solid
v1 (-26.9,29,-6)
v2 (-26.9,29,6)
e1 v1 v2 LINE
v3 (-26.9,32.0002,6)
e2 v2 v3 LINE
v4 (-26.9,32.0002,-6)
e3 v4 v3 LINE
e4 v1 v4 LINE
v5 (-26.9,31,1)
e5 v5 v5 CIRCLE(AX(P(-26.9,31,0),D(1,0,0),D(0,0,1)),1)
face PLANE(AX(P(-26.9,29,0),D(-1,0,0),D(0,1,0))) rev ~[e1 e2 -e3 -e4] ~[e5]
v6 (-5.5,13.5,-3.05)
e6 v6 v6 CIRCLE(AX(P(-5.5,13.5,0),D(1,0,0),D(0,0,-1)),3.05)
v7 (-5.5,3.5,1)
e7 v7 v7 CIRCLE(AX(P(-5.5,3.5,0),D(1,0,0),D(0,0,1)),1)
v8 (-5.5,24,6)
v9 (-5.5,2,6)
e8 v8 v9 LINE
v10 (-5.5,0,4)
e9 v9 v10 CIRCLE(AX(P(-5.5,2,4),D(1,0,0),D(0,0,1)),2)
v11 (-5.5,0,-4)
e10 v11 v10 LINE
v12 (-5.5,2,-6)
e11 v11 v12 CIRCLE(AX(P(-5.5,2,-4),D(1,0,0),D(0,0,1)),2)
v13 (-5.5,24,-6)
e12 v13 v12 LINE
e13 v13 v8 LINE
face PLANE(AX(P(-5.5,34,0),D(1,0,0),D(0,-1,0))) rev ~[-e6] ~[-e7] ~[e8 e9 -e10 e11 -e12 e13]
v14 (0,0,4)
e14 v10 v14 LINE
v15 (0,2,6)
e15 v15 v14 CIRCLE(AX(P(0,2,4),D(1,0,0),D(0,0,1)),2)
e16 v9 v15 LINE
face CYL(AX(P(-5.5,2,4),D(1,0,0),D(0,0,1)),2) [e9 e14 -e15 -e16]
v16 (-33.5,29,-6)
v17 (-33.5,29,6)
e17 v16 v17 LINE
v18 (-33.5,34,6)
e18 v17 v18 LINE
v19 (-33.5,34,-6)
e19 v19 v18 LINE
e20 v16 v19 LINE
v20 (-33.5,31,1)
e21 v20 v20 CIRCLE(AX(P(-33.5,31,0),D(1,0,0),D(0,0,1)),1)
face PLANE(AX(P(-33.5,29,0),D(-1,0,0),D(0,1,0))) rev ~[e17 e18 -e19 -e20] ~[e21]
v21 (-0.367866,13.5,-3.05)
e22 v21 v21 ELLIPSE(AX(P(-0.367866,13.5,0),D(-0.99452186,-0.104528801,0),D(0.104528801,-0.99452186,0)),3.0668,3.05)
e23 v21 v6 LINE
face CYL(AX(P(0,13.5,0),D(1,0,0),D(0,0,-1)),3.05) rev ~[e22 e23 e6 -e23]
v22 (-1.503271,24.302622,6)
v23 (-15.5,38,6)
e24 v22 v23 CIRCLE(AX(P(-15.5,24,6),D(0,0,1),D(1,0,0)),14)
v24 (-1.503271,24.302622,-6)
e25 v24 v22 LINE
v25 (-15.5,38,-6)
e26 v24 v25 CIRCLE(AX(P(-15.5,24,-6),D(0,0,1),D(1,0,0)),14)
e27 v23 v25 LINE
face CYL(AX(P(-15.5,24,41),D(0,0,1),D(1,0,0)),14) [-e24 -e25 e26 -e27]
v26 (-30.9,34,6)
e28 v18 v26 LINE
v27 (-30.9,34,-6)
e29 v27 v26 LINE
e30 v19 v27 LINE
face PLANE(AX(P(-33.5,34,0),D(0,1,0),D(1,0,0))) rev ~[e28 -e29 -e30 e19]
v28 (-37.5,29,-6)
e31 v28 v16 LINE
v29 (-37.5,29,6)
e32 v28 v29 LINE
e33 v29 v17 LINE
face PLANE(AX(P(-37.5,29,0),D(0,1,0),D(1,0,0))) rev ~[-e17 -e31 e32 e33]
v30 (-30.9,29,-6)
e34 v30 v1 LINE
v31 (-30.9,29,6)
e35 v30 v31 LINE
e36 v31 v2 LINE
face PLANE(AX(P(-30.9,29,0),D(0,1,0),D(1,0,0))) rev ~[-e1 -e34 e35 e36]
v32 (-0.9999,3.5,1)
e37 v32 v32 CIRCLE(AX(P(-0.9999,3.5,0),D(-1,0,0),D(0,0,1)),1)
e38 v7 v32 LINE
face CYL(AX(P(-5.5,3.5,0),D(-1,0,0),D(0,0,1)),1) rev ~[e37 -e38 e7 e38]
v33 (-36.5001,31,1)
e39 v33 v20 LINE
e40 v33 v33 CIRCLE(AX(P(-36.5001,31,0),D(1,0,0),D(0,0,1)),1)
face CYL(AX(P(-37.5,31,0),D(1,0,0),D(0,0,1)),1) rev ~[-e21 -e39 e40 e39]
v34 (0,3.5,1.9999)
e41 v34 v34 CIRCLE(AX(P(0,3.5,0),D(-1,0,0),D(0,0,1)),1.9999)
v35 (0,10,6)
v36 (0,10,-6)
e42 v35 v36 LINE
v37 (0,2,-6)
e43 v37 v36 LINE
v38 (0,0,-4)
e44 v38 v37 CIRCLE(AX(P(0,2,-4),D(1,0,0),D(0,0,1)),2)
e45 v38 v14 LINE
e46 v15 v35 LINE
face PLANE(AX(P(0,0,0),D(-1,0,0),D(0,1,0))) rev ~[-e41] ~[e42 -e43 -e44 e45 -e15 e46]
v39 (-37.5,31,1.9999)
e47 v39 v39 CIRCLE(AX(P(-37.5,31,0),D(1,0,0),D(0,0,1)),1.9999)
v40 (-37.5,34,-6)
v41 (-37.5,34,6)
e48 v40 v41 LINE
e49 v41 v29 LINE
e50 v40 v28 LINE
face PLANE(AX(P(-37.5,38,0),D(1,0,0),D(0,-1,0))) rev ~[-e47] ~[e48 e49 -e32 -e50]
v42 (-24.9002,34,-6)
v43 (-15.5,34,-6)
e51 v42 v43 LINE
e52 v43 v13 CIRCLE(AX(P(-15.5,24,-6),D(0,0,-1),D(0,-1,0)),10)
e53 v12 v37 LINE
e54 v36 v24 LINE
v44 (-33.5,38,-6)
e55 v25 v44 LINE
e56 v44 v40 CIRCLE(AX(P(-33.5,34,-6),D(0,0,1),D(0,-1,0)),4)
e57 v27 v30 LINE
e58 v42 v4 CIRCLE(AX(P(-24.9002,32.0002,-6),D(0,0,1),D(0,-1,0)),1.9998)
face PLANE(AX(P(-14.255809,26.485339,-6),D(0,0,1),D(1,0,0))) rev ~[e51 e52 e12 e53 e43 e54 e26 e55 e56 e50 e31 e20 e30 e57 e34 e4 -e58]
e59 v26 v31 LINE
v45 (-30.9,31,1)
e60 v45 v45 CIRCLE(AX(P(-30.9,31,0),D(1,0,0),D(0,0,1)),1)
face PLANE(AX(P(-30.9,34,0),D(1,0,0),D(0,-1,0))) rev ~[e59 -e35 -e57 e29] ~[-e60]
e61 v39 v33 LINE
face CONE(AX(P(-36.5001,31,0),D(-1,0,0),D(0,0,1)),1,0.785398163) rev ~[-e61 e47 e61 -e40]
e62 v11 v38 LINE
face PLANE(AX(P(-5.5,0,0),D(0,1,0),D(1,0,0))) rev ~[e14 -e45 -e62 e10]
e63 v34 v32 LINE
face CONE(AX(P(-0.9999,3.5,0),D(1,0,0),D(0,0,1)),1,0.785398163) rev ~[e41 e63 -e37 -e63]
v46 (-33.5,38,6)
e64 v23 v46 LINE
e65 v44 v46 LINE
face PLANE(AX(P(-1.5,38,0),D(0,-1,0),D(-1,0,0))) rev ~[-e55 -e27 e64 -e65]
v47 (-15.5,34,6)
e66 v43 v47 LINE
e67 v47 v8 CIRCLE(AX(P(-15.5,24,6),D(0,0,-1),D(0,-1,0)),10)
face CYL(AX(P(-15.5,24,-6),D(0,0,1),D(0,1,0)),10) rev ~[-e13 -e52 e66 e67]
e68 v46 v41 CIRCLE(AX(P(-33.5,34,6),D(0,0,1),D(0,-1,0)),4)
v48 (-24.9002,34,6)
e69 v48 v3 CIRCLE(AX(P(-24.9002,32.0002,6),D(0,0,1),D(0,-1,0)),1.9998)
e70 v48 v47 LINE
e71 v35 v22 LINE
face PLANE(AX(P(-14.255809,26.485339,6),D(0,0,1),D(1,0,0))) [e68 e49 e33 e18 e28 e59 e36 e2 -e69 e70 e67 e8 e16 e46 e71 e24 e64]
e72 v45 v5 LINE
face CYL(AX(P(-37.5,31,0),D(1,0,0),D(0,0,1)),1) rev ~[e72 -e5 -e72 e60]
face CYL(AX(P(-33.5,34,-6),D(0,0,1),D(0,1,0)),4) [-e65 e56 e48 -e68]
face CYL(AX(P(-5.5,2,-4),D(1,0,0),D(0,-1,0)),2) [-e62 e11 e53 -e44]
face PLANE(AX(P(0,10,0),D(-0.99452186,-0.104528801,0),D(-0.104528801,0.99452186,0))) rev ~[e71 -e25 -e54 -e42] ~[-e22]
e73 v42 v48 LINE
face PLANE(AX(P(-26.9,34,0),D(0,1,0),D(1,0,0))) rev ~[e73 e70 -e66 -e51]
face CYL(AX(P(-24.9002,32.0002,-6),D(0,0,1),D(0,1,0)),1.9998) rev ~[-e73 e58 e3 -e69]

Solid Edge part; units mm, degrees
sketch "Sketch1" plane through (0, 0, 0) normal (0, 0, 1) x (1, 0, 0)
  line L0 (-1.5, 38) -> (-37.5, 38)
  line L1 (-37.5, 38) -> (-37.5, 29)
  line L2 (-37.5, 29) -> (-33.5, 29)
  line L3 (-33.5, 29) -> (-33.5, 34)
  line L4 (-33.5, 34) -> (-30.9, 34)
  line L5 (-30.9, 34) -> (-30.9, 29)
  line L6 (-30.9, 29) -> (-26.9, 29)
  line L7 (-26.9, 29) -> (-26.9, 34)
  line L8 (-26.9, 34) -> (-5.5, 34)
  line L9 (-5.5, 34) -> (-5.5, 0)
  line L10 (-5.5, 0) -> (0, 0)
  line L11 (0, 0) -> (0, 10)
  line L12 (0, 10) -> (-1.5, 24.2715)
  line L13 (-1.5, 24.2715) -> (-1.5, 38)
  dimension "D1" = 4
  dimension "D2" = 32
  dimension "D3" = 34
  dimension "D4" = 5
  dimension "D5" = 2.6
  dimension "D6" = 4
  dimension "D7" = 5.5
  dimension "D8" = 4
  dimension "D9" = 10
extrude "Protrusion1" add sketch "Sketch1" along normal mid plane 12
hole "Agujero_1" at (-37.5, 31, 0) direction (1, 0, 0) diameter 2 depth 19.6879
hole "Agujero_3" at (-5.5, 3.5, 0) direction (1, 0, 0) diameter 2 end up to next
chamfer "Chaflán_1" distance 1 angle 45 2 edges at (-37.5, 31, -1) (0, 4.5, 0)
fillet "Redondeo_4" radius 10 1 edges at (-5.5, 34, 0)
fillet "Redondeo_5" radius 2 1 edges at (-26.9, 34, 0)
fillet "Redondeo_2" radius 4 1 edges at (-37.5, 38, 0)
fillet "Redondeo_3" radius 2 2 edges at (-2.75, 0, 6) (-2.75, 0, -6)
fillet "Redondeo_6" radius 14 1 edges at (-1.5, 38, 0)
hole "Agujero_4" at (0, 13.5, 0) direction (-1, 0, 0) diameter 6.1 end up to next
properties material "ABS, medio impacto"
